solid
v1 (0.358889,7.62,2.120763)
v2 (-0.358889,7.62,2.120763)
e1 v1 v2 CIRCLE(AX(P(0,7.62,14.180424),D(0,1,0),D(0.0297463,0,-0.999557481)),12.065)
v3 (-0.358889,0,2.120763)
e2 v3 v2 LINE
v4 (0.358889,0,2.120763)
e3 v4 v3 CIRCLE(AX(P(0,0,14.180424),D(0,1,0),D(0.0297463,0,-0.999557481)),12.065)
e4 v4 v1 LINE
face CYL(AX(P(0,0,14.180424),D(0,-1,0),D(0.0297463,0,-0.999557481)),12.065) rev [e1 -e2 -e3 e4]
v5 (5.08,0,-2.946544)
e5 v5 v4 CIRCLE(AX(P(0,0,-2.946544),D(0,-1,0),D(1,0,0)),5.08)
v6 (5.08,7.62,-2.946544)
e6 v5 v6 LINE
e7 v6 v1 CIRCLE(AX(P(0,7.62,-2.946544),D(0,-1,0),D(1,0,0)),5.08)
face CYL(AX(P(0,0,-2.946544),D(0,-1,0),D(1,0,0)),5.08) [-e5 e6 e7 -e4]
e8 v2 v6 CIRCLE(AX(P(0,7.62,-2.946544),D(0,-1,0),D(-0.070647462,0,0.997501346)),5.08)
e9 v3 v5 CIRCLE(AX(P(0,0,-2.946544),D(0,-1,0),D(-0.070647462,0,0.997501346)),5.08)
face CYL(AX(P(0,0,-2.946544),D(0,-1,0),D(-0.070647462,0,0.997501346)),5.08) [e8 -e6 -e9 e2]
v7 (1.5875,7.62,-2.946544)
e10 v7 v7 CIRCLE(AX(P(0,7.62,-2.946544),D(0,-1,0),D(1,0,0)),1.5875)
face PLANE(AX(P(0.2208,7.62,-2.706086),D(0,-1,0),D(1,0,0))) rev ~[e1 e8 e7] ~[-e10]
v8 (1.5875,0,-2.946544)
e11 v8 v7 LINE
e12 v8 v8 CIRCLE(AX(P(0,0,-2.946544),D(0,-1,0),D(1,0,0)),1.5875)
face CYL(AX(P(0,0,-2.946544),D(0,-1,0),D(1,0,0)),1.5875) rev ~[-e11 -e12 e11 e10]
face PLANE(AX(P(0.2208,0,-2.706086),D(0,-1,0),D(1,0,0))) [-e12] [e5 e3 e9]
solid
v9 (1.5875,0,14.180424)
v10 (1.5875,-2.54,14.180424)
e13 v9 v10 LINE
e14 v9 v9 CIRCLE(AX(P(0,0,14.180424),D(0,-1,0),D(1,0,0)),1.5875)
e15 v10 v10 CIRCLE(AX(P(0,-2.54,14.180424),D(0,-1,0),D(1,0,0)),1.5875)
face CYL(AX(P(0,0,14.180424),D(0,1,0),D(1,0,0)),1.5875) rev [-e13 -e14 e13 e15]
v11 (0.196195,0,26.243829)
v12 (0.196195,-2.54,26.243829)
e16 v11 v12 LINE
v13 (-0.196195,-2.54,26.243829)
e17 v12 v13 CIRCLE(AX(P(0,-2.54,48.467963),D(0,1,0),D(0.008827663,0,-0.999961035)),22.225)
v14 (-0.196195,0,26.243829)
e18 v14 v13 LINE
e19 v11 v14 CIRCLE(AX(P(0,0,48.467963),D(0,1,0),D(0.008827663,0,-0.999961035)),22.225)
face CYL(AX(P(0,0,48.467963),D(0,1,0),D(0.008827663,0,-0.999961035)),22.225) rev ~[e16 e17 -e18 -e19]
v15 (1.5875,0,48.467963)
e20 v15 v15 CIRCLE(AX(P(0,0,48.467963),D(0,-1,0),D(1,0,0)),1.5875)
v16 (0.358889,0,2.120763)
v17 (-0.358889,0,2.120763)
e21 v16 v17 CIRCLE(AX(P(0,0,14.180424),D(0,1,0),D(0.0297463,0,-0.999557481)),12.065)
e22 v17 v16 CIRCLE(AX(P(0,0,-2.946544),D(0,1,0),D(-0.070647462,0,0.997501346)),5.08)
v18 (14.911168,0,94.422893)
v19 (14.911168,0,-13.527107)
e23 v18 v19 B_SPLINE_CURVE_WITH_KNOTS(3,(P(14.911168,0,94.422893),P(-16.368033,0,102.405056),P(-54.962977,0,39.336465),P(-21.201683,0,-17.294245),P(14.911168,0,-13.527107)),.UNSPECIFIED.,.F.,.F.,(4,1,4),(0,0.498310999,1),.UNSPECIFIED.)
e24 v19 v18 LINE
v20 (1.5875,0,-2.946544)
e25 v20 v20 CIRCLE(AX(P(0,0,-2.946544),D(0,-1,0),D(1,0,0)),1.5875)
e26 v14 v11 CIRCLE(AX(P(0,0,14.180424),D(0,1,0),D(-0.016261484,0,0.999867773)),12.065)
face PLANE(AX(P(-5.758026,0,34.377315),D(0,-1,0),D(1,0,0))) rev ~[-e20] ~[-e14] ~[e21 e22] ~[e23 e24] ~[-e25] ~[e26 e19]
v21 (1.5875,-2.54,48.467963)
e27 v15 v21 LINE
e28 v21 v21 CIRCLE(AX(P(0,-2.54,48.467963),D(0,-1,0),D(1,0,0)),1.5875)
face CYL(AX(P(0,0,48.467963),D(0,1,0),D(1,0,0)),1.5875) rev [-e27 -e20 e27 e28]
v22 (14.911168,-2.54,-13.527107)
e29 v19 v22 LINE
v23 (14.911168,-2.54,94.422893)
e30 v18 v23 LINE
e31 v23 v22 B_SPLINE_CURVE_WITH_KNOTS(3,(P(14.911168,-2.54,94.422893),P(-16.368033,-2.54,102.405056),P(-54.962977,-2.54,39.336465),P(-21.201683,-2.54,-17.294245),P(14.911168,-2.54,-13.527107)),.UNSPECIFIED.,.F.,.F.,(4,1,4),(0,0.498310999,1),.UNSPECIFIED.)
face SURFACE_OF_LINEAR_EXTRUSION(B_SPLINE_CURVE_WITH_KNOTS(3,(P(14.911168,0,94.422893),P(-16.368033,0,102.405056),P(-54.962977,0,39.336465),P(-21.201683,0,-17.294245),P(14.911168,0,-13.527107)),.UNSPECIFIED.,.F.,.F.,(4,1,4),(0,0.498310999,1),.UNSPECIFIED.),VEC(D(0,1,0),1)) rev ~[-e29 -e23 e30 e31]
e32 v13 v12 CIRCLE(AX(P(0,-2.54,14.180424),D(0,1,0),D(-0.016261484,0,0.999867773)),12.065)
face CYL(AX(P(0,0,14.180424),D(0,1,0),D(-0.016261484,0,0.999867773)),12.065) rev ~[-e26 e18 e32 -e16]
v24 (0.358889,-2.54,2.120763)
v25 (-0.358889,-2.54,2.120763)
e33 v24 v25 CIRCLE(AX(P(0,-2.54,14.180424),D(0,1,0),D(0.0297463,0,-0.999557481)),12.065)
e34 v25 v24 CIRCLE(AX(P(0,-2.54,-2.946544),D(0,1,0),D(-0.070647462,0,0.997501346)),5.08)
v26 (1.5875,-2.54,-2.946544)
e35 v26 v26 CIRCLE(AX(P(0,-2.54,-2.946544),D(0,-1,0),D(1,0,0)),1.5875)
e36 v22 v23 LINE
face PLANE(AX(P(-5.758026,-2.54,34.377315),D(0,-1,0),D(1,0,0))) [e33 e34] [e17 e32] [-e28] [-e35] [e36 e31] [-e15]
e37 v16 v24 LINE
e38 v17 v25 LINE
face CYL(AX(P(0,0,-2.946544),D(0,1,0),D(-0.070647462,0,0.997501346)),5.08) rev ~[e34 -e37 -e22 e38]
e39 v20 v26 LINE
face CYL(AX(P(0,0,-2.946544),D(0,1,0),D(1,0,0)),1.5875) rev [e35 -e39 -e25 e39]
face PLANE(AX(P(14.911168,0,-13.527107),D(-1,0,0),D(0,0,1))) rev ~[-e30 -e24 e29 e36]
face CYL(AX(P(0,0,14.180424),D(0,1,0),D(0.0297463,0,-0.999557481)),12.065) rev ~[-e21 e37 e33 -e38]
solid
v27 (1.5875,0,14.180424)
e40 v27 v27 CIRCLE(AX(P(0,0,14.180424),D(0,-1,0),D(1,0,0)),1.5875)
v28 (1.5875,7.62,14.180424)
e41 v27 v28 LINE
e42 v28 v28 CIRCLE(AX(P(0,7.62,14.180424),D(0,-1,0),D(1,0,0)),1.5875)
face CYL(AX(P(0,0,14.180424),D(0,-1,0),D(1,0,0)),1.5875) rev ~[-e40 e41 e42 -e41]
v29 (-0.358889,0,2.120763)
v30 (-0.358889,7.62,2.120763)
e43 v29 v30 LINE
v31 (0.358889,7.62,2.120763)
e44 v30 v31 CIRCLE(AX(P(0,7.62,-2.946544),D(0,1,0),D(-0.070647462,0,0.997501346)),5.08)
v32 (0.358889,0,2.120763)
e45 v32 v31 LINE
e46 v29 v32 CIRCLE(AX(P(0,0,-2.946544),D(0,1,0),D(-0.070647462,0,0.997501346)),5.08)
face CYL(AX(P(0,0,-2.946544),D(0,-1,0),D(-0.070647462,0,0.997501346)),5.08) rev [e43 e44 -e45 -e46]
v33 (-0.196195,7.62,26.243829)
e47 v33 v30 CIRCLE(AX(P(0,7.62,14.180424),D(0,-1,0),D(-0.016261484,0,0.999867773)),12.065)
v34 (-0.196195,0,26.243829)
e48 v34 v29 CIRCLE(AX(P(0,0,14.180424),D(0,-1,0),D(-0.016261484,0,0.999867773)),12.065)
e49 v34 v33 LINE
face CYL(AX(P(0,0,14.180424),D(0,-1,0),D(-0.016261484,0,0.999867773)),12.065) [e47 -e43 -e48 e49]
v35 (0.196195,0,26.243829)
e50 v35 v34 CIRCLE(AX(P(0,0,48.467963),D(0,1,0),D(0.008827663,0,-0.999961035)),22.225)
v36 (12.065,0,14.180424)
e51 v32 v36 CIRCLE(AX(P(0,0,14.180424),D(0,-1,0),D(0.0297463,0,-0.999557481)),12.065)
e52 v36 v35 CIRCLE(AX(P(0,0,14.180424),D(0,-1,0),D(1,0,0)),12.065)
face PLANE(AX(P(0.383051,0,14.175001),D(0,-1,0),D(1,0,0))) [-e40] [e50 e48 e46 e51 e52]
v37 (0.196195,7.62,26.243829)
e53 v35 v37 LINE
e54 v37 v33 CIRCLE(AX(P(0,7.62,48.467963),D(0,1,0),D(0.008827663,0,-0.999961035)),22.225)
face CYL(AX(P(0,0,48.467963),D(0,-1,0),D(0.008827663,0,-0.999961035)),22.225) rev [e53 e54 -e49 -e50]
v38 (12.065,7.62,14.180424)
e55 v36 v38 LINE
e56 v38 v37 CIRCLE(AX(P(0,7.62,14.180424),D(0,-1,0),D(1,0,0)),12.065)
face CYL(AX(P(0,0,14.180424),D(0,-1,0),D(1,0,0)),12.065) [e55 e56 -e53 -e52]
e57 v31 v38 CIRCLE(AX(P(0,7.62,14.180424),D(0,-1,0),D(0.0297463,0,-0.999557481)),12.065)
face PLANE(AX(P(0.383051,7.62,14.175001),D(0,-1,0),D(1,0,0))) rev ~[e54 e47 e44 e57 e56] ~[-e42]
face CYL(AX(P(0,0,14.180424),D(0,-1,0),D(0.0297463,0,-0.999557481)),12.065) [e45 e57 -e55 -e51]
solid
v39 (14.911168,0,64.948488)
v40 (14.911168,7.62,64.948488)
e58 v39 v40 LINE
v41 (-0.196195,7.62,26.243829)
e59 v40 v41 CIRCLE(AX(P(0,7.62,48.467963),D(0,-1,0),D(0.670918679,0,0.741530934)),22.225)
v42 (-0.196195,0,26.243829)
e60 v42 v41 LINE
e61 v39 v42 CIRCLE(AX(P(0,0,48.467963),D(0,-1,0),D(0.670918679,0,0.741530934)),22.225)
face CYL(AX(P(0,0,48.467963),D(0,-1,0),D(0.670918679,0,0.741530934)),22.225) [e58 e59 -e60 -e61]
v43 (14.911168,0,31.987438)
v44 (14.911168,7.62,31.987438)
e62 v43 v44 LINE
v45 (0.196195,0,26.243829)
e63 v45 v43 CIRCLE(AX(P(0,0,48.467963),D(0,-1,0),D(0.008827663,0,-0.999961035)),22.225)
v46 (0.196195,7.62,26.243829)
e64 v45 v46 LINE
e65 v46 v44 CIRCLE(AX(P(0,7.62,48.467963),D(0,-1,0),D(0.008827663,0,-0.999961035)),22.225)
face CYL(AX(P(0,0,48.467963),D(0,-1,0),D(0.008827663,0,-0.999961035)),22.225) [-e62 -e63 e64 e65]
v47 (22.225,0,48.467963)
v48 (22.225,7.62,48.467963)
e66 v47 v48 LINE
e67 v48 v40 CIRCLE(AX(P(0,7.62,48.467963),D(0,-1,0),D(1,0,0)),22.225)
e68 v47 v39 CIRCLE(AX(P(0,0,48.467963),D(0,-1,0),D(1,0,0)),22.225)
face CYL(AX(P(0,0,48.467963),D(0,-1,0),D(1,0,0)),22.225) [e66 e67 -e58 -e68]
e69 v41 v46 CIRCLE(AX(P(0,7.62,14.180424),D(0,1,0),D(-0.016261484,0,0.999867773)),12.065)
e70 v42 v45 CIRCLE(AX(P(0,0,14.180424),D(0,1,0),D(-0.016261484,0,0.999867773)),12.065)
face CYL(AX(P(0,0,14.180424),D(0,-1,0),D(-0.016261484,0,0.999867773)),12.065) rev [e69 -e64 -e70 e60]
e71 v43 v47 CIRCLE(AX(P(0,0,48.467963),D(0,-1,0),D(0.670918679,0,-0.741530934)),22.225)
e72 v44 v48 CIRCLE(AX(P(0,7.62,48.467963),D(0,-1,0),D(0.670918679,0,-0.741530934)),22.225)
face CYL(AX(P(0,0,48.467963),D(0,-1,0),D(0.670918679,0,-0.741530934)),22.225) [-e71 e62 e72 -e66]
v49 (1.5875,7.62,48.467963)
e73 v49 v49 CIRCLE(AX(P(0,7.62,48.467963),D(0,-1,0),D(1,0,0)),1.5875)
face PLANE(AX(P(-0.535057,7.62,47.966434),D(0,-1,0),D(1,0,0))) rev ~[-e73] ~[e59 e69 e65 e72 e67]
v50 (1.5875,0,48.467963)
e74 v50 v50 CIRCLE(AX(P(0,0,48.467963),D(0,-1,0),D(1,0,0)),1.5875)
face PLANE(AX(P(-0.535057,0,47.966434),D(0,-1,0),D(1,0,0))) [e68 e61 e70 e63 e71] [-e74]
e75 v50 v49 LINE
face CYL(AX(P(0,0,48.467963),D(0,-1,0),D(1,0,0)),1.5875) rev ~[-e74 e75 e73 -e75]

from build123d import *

# Parameters (mm, degrees)
F0_R     = 1.5875
F1_DEPTH = 2.54
F2_DEPTH = 7.62
F3_DEPTH = 7.62
F4_DEPTH = 7.62


# Not quite as in the source:
# - a feature names something its author has since deleted; it is built from what else it names


with BuildPart() as f1:
    # F0 (on Front) → F1 (new body)
    with BuildSketch(Plane.XZ):
        with BuildLine():
            Line((14.9111676306, 64.9484875902), (14.9111676306, 94.4228925787))
            add(Edge.make_bspline(
                [(14.9111676306, 94.4228925787), (-16.3680333644, 102.4050563574), (-54.9629772168, 39.3364652633), (-21.2016832001, -17.2942446428), (14.9111676306, -13.5271074213)],
                knots=[0, 0, 0, 0, 0.4983109993, 1, 1, 1, 1], degree=3))
            Line((14.9111676306, -13.5271074213), (14.9111676306, 31.9874375527))
            ThreePointArc((14.9111676306, 31.9874375527), (8.0811732468, 27.7642125741), (0.1961948099, 26.2438285592))
            ThreePointArc((0.1961948099, 26.2438285592), (8.6003289292, 22.6420175366), (12.065, 14.1804238741))
            ThreePointArc((12.065, 14.1804238741), (8.6571999537, 5.7770249212), (0.358889107, 2.1207628669))
            ThreePointArc((0.358889107, 2.1207628669), (3.7168236886, 0.516348123), (5.08, -2.9465439729))
            ThreePointArc((5.08, -2.9465439729), (-3.4628920959, -6.6633676615), (-0.358889107, 2.1207628669))
            ThreePointArc((-0.358889107, 2.1207628669), (-12.0647256139, 14.2617925558), (-0.1961948099, 26.2438285592))
            ThreePointArc((-0.1961948099, 26.2438285592), (-20.7037499974, 56.5491358183), (14.9111676306, 64.9484875902))
        make_face()
        with BuildLine():
            Line((14.9111676306, 31.9874375527), (14.9111676306, 64.9484875902))
            ThreePointArc((14.9111676306, 64.9484875902), (-20.7037499974, 56.5491358183), (-0.1961948099, 26.2438285592))
            ThreePointArc((-0.1961948099, 26.2438285592), (0, 26.2454238741), (0.1961948099, 26.2438285592))
            ThreePointArc((0.1961948099, 26.2438285592), (8.0811732468, 27.7642125741), (14.9111676306, 31.9874375527))
        make_face()
        with Locations((0, 48.4679625715)):
            Circle(F0_R, mode=Mode.SUBTRACT)
        with BuildLine():
            ThreePointArc((0.1961948099, 26.2438285592), (0, 26.2429625715), (-0.1961948099, 26.2438285592))
            ThreePointArc((-0.1961948099, 26.2438285592), (-12.0647256139, 14.2617925558), (-0.358889107, 2.1207628669))
            ThreePointArc((-0.358889107, 2.1207628669), (0, 2.1334560271), (0.358889107, 2.1207628669))
            ThreePointArc((0.358889107, 2.1207628669), (8.6571999537, 5.7770249212), (12.065, 14.1804238741))
            ThreePointArc((12.065, 14.1804238741), (8.6003289292, 22.6420175366), (0.1961948099, 26.2438285592))
        make_face()
        with Locations((0, 14.1804238741)):
            Circle(F0_R, mode=Mode.SUBTRACT)
        with BuildLine():
            ThreePointArc((0.358889107, 2.1207628669), (0, 2.1154238741), (-0.358889107, 2.1207628669))
            ThreePointArc((-0.358889107, 2.1207628669), (-3.4628920959, -6.6633676615), (5.08, -2.9465439729))
            ThreePointArc((5.08, -2.9465439729), (3.7168236886, 0.516348123), (0.358889107, 2.1207628669))
        make_face()
        with Locations((0, -2.9465439729)):
            Circle(F0_R, mode=Mode.SUBTRACT)
    extrude(amount=F1_DEPTH)


with BuildPart() as f2:
    # F0 (on Front) → F2 (new body)
    with BuildSketch(Plane.XZ):
        with BuildLine():
            Line((14.9111676306, 31.9874375527), (14.9111676306, 64.9484875902))
            ThreePointArc((14.9111676306, 64.9484875902), (-20.7037499974, 56.5491358183), (-0.1961948099, 26.2438285592))
            ThreePointArc((-0.1961948099, 26.2438285592), (0, 26.2454238741), (0.1961948099, 26.2438285592))
            ThreePointArc((0.1961948099, 26.2438285592), (8.0811732468, 27.7642125741), (14.9111676306, 31.9874375527))
        make_face()
        with Locations((0, 48.4679625715)):
            Circle(F0_R, mode=Mode.SUBTRACT)
        with BuildLine():
            ThreePointArc((22.225, 48.4679625715), (20.3144200703, 57.4832253078), (14.9111676306, 64.9484875902))
            Line((14.9111676306, 64.9484875902), (14.9111676306, 31.9874375527))
            ThreePointArc((14.9111676306, 31.9874375527), (20.3144200703, 39.4526998351), (22.225, 48.4679625715))
        make_face()
    extrude(amount=-F2_DEPTH)


with BuildPart() as f3:
    # F0 (on Front) → F3 (new body)
    with BuildSketch(Plane.XZ):
        with BuildLine():
            ThreePointArc((0.1961948099, 26.2438285592), (0, 26.2429625715), (-0.1961948099, 26.2438285592))
            ThreePointArc((-0.1961948099, 26.2438285592), (-12.0647256139, 14.2617925558), (-0.358889107, 2.1207628669))
            ThreePointArc((-0.358889107, 2.1207628669), (0, 2.1334560271), (0.358889107, 2.1207628669))
            ThreePointArc((0.358889107, 2.1207628669), (8.6571999537, 5.7770249212), (12.065, 14.1804238741))
            ThreePointArc((12.065, 14.1804238741), (8.6003289292, 22.6420175366), (0.1961948099, 26.2438285592))
        make_face()
        with Locations((0, 14.1804238741)):
            Circle(F0_R, mode=Mode.SUBTRACT)
    extrude(amount=-F3_DEPTH)


with BuildPart() as f4:
    # F0 (on Front) → F4 (new body)
    with BuildSketch(Plane.XZ):
        with BuildLine():
            ThreePointArc((0.358889107, 2.1207628669), (0, 2.1154238741), (-0.358889107, 2.1207628669))
            ThreePointArc((-0.358889107, 2.1207628669), (-3.4628920959, -6.6633676615), (5.08, -2.9465439729))
            ThreePointArc((5.08, -2.9465439729), (3.7168236886, 0.516348123), (0.358889107, 2.1207628669))
        make_face()
        with Locations((0, -2.9465439729)):
            Circle(F0_R, mode=Mode.SUBTRACT)
    extrude(amount=-F4_DEPTH)


solid = Compound([f1.part, f2.part, f3.part, f4.part])
